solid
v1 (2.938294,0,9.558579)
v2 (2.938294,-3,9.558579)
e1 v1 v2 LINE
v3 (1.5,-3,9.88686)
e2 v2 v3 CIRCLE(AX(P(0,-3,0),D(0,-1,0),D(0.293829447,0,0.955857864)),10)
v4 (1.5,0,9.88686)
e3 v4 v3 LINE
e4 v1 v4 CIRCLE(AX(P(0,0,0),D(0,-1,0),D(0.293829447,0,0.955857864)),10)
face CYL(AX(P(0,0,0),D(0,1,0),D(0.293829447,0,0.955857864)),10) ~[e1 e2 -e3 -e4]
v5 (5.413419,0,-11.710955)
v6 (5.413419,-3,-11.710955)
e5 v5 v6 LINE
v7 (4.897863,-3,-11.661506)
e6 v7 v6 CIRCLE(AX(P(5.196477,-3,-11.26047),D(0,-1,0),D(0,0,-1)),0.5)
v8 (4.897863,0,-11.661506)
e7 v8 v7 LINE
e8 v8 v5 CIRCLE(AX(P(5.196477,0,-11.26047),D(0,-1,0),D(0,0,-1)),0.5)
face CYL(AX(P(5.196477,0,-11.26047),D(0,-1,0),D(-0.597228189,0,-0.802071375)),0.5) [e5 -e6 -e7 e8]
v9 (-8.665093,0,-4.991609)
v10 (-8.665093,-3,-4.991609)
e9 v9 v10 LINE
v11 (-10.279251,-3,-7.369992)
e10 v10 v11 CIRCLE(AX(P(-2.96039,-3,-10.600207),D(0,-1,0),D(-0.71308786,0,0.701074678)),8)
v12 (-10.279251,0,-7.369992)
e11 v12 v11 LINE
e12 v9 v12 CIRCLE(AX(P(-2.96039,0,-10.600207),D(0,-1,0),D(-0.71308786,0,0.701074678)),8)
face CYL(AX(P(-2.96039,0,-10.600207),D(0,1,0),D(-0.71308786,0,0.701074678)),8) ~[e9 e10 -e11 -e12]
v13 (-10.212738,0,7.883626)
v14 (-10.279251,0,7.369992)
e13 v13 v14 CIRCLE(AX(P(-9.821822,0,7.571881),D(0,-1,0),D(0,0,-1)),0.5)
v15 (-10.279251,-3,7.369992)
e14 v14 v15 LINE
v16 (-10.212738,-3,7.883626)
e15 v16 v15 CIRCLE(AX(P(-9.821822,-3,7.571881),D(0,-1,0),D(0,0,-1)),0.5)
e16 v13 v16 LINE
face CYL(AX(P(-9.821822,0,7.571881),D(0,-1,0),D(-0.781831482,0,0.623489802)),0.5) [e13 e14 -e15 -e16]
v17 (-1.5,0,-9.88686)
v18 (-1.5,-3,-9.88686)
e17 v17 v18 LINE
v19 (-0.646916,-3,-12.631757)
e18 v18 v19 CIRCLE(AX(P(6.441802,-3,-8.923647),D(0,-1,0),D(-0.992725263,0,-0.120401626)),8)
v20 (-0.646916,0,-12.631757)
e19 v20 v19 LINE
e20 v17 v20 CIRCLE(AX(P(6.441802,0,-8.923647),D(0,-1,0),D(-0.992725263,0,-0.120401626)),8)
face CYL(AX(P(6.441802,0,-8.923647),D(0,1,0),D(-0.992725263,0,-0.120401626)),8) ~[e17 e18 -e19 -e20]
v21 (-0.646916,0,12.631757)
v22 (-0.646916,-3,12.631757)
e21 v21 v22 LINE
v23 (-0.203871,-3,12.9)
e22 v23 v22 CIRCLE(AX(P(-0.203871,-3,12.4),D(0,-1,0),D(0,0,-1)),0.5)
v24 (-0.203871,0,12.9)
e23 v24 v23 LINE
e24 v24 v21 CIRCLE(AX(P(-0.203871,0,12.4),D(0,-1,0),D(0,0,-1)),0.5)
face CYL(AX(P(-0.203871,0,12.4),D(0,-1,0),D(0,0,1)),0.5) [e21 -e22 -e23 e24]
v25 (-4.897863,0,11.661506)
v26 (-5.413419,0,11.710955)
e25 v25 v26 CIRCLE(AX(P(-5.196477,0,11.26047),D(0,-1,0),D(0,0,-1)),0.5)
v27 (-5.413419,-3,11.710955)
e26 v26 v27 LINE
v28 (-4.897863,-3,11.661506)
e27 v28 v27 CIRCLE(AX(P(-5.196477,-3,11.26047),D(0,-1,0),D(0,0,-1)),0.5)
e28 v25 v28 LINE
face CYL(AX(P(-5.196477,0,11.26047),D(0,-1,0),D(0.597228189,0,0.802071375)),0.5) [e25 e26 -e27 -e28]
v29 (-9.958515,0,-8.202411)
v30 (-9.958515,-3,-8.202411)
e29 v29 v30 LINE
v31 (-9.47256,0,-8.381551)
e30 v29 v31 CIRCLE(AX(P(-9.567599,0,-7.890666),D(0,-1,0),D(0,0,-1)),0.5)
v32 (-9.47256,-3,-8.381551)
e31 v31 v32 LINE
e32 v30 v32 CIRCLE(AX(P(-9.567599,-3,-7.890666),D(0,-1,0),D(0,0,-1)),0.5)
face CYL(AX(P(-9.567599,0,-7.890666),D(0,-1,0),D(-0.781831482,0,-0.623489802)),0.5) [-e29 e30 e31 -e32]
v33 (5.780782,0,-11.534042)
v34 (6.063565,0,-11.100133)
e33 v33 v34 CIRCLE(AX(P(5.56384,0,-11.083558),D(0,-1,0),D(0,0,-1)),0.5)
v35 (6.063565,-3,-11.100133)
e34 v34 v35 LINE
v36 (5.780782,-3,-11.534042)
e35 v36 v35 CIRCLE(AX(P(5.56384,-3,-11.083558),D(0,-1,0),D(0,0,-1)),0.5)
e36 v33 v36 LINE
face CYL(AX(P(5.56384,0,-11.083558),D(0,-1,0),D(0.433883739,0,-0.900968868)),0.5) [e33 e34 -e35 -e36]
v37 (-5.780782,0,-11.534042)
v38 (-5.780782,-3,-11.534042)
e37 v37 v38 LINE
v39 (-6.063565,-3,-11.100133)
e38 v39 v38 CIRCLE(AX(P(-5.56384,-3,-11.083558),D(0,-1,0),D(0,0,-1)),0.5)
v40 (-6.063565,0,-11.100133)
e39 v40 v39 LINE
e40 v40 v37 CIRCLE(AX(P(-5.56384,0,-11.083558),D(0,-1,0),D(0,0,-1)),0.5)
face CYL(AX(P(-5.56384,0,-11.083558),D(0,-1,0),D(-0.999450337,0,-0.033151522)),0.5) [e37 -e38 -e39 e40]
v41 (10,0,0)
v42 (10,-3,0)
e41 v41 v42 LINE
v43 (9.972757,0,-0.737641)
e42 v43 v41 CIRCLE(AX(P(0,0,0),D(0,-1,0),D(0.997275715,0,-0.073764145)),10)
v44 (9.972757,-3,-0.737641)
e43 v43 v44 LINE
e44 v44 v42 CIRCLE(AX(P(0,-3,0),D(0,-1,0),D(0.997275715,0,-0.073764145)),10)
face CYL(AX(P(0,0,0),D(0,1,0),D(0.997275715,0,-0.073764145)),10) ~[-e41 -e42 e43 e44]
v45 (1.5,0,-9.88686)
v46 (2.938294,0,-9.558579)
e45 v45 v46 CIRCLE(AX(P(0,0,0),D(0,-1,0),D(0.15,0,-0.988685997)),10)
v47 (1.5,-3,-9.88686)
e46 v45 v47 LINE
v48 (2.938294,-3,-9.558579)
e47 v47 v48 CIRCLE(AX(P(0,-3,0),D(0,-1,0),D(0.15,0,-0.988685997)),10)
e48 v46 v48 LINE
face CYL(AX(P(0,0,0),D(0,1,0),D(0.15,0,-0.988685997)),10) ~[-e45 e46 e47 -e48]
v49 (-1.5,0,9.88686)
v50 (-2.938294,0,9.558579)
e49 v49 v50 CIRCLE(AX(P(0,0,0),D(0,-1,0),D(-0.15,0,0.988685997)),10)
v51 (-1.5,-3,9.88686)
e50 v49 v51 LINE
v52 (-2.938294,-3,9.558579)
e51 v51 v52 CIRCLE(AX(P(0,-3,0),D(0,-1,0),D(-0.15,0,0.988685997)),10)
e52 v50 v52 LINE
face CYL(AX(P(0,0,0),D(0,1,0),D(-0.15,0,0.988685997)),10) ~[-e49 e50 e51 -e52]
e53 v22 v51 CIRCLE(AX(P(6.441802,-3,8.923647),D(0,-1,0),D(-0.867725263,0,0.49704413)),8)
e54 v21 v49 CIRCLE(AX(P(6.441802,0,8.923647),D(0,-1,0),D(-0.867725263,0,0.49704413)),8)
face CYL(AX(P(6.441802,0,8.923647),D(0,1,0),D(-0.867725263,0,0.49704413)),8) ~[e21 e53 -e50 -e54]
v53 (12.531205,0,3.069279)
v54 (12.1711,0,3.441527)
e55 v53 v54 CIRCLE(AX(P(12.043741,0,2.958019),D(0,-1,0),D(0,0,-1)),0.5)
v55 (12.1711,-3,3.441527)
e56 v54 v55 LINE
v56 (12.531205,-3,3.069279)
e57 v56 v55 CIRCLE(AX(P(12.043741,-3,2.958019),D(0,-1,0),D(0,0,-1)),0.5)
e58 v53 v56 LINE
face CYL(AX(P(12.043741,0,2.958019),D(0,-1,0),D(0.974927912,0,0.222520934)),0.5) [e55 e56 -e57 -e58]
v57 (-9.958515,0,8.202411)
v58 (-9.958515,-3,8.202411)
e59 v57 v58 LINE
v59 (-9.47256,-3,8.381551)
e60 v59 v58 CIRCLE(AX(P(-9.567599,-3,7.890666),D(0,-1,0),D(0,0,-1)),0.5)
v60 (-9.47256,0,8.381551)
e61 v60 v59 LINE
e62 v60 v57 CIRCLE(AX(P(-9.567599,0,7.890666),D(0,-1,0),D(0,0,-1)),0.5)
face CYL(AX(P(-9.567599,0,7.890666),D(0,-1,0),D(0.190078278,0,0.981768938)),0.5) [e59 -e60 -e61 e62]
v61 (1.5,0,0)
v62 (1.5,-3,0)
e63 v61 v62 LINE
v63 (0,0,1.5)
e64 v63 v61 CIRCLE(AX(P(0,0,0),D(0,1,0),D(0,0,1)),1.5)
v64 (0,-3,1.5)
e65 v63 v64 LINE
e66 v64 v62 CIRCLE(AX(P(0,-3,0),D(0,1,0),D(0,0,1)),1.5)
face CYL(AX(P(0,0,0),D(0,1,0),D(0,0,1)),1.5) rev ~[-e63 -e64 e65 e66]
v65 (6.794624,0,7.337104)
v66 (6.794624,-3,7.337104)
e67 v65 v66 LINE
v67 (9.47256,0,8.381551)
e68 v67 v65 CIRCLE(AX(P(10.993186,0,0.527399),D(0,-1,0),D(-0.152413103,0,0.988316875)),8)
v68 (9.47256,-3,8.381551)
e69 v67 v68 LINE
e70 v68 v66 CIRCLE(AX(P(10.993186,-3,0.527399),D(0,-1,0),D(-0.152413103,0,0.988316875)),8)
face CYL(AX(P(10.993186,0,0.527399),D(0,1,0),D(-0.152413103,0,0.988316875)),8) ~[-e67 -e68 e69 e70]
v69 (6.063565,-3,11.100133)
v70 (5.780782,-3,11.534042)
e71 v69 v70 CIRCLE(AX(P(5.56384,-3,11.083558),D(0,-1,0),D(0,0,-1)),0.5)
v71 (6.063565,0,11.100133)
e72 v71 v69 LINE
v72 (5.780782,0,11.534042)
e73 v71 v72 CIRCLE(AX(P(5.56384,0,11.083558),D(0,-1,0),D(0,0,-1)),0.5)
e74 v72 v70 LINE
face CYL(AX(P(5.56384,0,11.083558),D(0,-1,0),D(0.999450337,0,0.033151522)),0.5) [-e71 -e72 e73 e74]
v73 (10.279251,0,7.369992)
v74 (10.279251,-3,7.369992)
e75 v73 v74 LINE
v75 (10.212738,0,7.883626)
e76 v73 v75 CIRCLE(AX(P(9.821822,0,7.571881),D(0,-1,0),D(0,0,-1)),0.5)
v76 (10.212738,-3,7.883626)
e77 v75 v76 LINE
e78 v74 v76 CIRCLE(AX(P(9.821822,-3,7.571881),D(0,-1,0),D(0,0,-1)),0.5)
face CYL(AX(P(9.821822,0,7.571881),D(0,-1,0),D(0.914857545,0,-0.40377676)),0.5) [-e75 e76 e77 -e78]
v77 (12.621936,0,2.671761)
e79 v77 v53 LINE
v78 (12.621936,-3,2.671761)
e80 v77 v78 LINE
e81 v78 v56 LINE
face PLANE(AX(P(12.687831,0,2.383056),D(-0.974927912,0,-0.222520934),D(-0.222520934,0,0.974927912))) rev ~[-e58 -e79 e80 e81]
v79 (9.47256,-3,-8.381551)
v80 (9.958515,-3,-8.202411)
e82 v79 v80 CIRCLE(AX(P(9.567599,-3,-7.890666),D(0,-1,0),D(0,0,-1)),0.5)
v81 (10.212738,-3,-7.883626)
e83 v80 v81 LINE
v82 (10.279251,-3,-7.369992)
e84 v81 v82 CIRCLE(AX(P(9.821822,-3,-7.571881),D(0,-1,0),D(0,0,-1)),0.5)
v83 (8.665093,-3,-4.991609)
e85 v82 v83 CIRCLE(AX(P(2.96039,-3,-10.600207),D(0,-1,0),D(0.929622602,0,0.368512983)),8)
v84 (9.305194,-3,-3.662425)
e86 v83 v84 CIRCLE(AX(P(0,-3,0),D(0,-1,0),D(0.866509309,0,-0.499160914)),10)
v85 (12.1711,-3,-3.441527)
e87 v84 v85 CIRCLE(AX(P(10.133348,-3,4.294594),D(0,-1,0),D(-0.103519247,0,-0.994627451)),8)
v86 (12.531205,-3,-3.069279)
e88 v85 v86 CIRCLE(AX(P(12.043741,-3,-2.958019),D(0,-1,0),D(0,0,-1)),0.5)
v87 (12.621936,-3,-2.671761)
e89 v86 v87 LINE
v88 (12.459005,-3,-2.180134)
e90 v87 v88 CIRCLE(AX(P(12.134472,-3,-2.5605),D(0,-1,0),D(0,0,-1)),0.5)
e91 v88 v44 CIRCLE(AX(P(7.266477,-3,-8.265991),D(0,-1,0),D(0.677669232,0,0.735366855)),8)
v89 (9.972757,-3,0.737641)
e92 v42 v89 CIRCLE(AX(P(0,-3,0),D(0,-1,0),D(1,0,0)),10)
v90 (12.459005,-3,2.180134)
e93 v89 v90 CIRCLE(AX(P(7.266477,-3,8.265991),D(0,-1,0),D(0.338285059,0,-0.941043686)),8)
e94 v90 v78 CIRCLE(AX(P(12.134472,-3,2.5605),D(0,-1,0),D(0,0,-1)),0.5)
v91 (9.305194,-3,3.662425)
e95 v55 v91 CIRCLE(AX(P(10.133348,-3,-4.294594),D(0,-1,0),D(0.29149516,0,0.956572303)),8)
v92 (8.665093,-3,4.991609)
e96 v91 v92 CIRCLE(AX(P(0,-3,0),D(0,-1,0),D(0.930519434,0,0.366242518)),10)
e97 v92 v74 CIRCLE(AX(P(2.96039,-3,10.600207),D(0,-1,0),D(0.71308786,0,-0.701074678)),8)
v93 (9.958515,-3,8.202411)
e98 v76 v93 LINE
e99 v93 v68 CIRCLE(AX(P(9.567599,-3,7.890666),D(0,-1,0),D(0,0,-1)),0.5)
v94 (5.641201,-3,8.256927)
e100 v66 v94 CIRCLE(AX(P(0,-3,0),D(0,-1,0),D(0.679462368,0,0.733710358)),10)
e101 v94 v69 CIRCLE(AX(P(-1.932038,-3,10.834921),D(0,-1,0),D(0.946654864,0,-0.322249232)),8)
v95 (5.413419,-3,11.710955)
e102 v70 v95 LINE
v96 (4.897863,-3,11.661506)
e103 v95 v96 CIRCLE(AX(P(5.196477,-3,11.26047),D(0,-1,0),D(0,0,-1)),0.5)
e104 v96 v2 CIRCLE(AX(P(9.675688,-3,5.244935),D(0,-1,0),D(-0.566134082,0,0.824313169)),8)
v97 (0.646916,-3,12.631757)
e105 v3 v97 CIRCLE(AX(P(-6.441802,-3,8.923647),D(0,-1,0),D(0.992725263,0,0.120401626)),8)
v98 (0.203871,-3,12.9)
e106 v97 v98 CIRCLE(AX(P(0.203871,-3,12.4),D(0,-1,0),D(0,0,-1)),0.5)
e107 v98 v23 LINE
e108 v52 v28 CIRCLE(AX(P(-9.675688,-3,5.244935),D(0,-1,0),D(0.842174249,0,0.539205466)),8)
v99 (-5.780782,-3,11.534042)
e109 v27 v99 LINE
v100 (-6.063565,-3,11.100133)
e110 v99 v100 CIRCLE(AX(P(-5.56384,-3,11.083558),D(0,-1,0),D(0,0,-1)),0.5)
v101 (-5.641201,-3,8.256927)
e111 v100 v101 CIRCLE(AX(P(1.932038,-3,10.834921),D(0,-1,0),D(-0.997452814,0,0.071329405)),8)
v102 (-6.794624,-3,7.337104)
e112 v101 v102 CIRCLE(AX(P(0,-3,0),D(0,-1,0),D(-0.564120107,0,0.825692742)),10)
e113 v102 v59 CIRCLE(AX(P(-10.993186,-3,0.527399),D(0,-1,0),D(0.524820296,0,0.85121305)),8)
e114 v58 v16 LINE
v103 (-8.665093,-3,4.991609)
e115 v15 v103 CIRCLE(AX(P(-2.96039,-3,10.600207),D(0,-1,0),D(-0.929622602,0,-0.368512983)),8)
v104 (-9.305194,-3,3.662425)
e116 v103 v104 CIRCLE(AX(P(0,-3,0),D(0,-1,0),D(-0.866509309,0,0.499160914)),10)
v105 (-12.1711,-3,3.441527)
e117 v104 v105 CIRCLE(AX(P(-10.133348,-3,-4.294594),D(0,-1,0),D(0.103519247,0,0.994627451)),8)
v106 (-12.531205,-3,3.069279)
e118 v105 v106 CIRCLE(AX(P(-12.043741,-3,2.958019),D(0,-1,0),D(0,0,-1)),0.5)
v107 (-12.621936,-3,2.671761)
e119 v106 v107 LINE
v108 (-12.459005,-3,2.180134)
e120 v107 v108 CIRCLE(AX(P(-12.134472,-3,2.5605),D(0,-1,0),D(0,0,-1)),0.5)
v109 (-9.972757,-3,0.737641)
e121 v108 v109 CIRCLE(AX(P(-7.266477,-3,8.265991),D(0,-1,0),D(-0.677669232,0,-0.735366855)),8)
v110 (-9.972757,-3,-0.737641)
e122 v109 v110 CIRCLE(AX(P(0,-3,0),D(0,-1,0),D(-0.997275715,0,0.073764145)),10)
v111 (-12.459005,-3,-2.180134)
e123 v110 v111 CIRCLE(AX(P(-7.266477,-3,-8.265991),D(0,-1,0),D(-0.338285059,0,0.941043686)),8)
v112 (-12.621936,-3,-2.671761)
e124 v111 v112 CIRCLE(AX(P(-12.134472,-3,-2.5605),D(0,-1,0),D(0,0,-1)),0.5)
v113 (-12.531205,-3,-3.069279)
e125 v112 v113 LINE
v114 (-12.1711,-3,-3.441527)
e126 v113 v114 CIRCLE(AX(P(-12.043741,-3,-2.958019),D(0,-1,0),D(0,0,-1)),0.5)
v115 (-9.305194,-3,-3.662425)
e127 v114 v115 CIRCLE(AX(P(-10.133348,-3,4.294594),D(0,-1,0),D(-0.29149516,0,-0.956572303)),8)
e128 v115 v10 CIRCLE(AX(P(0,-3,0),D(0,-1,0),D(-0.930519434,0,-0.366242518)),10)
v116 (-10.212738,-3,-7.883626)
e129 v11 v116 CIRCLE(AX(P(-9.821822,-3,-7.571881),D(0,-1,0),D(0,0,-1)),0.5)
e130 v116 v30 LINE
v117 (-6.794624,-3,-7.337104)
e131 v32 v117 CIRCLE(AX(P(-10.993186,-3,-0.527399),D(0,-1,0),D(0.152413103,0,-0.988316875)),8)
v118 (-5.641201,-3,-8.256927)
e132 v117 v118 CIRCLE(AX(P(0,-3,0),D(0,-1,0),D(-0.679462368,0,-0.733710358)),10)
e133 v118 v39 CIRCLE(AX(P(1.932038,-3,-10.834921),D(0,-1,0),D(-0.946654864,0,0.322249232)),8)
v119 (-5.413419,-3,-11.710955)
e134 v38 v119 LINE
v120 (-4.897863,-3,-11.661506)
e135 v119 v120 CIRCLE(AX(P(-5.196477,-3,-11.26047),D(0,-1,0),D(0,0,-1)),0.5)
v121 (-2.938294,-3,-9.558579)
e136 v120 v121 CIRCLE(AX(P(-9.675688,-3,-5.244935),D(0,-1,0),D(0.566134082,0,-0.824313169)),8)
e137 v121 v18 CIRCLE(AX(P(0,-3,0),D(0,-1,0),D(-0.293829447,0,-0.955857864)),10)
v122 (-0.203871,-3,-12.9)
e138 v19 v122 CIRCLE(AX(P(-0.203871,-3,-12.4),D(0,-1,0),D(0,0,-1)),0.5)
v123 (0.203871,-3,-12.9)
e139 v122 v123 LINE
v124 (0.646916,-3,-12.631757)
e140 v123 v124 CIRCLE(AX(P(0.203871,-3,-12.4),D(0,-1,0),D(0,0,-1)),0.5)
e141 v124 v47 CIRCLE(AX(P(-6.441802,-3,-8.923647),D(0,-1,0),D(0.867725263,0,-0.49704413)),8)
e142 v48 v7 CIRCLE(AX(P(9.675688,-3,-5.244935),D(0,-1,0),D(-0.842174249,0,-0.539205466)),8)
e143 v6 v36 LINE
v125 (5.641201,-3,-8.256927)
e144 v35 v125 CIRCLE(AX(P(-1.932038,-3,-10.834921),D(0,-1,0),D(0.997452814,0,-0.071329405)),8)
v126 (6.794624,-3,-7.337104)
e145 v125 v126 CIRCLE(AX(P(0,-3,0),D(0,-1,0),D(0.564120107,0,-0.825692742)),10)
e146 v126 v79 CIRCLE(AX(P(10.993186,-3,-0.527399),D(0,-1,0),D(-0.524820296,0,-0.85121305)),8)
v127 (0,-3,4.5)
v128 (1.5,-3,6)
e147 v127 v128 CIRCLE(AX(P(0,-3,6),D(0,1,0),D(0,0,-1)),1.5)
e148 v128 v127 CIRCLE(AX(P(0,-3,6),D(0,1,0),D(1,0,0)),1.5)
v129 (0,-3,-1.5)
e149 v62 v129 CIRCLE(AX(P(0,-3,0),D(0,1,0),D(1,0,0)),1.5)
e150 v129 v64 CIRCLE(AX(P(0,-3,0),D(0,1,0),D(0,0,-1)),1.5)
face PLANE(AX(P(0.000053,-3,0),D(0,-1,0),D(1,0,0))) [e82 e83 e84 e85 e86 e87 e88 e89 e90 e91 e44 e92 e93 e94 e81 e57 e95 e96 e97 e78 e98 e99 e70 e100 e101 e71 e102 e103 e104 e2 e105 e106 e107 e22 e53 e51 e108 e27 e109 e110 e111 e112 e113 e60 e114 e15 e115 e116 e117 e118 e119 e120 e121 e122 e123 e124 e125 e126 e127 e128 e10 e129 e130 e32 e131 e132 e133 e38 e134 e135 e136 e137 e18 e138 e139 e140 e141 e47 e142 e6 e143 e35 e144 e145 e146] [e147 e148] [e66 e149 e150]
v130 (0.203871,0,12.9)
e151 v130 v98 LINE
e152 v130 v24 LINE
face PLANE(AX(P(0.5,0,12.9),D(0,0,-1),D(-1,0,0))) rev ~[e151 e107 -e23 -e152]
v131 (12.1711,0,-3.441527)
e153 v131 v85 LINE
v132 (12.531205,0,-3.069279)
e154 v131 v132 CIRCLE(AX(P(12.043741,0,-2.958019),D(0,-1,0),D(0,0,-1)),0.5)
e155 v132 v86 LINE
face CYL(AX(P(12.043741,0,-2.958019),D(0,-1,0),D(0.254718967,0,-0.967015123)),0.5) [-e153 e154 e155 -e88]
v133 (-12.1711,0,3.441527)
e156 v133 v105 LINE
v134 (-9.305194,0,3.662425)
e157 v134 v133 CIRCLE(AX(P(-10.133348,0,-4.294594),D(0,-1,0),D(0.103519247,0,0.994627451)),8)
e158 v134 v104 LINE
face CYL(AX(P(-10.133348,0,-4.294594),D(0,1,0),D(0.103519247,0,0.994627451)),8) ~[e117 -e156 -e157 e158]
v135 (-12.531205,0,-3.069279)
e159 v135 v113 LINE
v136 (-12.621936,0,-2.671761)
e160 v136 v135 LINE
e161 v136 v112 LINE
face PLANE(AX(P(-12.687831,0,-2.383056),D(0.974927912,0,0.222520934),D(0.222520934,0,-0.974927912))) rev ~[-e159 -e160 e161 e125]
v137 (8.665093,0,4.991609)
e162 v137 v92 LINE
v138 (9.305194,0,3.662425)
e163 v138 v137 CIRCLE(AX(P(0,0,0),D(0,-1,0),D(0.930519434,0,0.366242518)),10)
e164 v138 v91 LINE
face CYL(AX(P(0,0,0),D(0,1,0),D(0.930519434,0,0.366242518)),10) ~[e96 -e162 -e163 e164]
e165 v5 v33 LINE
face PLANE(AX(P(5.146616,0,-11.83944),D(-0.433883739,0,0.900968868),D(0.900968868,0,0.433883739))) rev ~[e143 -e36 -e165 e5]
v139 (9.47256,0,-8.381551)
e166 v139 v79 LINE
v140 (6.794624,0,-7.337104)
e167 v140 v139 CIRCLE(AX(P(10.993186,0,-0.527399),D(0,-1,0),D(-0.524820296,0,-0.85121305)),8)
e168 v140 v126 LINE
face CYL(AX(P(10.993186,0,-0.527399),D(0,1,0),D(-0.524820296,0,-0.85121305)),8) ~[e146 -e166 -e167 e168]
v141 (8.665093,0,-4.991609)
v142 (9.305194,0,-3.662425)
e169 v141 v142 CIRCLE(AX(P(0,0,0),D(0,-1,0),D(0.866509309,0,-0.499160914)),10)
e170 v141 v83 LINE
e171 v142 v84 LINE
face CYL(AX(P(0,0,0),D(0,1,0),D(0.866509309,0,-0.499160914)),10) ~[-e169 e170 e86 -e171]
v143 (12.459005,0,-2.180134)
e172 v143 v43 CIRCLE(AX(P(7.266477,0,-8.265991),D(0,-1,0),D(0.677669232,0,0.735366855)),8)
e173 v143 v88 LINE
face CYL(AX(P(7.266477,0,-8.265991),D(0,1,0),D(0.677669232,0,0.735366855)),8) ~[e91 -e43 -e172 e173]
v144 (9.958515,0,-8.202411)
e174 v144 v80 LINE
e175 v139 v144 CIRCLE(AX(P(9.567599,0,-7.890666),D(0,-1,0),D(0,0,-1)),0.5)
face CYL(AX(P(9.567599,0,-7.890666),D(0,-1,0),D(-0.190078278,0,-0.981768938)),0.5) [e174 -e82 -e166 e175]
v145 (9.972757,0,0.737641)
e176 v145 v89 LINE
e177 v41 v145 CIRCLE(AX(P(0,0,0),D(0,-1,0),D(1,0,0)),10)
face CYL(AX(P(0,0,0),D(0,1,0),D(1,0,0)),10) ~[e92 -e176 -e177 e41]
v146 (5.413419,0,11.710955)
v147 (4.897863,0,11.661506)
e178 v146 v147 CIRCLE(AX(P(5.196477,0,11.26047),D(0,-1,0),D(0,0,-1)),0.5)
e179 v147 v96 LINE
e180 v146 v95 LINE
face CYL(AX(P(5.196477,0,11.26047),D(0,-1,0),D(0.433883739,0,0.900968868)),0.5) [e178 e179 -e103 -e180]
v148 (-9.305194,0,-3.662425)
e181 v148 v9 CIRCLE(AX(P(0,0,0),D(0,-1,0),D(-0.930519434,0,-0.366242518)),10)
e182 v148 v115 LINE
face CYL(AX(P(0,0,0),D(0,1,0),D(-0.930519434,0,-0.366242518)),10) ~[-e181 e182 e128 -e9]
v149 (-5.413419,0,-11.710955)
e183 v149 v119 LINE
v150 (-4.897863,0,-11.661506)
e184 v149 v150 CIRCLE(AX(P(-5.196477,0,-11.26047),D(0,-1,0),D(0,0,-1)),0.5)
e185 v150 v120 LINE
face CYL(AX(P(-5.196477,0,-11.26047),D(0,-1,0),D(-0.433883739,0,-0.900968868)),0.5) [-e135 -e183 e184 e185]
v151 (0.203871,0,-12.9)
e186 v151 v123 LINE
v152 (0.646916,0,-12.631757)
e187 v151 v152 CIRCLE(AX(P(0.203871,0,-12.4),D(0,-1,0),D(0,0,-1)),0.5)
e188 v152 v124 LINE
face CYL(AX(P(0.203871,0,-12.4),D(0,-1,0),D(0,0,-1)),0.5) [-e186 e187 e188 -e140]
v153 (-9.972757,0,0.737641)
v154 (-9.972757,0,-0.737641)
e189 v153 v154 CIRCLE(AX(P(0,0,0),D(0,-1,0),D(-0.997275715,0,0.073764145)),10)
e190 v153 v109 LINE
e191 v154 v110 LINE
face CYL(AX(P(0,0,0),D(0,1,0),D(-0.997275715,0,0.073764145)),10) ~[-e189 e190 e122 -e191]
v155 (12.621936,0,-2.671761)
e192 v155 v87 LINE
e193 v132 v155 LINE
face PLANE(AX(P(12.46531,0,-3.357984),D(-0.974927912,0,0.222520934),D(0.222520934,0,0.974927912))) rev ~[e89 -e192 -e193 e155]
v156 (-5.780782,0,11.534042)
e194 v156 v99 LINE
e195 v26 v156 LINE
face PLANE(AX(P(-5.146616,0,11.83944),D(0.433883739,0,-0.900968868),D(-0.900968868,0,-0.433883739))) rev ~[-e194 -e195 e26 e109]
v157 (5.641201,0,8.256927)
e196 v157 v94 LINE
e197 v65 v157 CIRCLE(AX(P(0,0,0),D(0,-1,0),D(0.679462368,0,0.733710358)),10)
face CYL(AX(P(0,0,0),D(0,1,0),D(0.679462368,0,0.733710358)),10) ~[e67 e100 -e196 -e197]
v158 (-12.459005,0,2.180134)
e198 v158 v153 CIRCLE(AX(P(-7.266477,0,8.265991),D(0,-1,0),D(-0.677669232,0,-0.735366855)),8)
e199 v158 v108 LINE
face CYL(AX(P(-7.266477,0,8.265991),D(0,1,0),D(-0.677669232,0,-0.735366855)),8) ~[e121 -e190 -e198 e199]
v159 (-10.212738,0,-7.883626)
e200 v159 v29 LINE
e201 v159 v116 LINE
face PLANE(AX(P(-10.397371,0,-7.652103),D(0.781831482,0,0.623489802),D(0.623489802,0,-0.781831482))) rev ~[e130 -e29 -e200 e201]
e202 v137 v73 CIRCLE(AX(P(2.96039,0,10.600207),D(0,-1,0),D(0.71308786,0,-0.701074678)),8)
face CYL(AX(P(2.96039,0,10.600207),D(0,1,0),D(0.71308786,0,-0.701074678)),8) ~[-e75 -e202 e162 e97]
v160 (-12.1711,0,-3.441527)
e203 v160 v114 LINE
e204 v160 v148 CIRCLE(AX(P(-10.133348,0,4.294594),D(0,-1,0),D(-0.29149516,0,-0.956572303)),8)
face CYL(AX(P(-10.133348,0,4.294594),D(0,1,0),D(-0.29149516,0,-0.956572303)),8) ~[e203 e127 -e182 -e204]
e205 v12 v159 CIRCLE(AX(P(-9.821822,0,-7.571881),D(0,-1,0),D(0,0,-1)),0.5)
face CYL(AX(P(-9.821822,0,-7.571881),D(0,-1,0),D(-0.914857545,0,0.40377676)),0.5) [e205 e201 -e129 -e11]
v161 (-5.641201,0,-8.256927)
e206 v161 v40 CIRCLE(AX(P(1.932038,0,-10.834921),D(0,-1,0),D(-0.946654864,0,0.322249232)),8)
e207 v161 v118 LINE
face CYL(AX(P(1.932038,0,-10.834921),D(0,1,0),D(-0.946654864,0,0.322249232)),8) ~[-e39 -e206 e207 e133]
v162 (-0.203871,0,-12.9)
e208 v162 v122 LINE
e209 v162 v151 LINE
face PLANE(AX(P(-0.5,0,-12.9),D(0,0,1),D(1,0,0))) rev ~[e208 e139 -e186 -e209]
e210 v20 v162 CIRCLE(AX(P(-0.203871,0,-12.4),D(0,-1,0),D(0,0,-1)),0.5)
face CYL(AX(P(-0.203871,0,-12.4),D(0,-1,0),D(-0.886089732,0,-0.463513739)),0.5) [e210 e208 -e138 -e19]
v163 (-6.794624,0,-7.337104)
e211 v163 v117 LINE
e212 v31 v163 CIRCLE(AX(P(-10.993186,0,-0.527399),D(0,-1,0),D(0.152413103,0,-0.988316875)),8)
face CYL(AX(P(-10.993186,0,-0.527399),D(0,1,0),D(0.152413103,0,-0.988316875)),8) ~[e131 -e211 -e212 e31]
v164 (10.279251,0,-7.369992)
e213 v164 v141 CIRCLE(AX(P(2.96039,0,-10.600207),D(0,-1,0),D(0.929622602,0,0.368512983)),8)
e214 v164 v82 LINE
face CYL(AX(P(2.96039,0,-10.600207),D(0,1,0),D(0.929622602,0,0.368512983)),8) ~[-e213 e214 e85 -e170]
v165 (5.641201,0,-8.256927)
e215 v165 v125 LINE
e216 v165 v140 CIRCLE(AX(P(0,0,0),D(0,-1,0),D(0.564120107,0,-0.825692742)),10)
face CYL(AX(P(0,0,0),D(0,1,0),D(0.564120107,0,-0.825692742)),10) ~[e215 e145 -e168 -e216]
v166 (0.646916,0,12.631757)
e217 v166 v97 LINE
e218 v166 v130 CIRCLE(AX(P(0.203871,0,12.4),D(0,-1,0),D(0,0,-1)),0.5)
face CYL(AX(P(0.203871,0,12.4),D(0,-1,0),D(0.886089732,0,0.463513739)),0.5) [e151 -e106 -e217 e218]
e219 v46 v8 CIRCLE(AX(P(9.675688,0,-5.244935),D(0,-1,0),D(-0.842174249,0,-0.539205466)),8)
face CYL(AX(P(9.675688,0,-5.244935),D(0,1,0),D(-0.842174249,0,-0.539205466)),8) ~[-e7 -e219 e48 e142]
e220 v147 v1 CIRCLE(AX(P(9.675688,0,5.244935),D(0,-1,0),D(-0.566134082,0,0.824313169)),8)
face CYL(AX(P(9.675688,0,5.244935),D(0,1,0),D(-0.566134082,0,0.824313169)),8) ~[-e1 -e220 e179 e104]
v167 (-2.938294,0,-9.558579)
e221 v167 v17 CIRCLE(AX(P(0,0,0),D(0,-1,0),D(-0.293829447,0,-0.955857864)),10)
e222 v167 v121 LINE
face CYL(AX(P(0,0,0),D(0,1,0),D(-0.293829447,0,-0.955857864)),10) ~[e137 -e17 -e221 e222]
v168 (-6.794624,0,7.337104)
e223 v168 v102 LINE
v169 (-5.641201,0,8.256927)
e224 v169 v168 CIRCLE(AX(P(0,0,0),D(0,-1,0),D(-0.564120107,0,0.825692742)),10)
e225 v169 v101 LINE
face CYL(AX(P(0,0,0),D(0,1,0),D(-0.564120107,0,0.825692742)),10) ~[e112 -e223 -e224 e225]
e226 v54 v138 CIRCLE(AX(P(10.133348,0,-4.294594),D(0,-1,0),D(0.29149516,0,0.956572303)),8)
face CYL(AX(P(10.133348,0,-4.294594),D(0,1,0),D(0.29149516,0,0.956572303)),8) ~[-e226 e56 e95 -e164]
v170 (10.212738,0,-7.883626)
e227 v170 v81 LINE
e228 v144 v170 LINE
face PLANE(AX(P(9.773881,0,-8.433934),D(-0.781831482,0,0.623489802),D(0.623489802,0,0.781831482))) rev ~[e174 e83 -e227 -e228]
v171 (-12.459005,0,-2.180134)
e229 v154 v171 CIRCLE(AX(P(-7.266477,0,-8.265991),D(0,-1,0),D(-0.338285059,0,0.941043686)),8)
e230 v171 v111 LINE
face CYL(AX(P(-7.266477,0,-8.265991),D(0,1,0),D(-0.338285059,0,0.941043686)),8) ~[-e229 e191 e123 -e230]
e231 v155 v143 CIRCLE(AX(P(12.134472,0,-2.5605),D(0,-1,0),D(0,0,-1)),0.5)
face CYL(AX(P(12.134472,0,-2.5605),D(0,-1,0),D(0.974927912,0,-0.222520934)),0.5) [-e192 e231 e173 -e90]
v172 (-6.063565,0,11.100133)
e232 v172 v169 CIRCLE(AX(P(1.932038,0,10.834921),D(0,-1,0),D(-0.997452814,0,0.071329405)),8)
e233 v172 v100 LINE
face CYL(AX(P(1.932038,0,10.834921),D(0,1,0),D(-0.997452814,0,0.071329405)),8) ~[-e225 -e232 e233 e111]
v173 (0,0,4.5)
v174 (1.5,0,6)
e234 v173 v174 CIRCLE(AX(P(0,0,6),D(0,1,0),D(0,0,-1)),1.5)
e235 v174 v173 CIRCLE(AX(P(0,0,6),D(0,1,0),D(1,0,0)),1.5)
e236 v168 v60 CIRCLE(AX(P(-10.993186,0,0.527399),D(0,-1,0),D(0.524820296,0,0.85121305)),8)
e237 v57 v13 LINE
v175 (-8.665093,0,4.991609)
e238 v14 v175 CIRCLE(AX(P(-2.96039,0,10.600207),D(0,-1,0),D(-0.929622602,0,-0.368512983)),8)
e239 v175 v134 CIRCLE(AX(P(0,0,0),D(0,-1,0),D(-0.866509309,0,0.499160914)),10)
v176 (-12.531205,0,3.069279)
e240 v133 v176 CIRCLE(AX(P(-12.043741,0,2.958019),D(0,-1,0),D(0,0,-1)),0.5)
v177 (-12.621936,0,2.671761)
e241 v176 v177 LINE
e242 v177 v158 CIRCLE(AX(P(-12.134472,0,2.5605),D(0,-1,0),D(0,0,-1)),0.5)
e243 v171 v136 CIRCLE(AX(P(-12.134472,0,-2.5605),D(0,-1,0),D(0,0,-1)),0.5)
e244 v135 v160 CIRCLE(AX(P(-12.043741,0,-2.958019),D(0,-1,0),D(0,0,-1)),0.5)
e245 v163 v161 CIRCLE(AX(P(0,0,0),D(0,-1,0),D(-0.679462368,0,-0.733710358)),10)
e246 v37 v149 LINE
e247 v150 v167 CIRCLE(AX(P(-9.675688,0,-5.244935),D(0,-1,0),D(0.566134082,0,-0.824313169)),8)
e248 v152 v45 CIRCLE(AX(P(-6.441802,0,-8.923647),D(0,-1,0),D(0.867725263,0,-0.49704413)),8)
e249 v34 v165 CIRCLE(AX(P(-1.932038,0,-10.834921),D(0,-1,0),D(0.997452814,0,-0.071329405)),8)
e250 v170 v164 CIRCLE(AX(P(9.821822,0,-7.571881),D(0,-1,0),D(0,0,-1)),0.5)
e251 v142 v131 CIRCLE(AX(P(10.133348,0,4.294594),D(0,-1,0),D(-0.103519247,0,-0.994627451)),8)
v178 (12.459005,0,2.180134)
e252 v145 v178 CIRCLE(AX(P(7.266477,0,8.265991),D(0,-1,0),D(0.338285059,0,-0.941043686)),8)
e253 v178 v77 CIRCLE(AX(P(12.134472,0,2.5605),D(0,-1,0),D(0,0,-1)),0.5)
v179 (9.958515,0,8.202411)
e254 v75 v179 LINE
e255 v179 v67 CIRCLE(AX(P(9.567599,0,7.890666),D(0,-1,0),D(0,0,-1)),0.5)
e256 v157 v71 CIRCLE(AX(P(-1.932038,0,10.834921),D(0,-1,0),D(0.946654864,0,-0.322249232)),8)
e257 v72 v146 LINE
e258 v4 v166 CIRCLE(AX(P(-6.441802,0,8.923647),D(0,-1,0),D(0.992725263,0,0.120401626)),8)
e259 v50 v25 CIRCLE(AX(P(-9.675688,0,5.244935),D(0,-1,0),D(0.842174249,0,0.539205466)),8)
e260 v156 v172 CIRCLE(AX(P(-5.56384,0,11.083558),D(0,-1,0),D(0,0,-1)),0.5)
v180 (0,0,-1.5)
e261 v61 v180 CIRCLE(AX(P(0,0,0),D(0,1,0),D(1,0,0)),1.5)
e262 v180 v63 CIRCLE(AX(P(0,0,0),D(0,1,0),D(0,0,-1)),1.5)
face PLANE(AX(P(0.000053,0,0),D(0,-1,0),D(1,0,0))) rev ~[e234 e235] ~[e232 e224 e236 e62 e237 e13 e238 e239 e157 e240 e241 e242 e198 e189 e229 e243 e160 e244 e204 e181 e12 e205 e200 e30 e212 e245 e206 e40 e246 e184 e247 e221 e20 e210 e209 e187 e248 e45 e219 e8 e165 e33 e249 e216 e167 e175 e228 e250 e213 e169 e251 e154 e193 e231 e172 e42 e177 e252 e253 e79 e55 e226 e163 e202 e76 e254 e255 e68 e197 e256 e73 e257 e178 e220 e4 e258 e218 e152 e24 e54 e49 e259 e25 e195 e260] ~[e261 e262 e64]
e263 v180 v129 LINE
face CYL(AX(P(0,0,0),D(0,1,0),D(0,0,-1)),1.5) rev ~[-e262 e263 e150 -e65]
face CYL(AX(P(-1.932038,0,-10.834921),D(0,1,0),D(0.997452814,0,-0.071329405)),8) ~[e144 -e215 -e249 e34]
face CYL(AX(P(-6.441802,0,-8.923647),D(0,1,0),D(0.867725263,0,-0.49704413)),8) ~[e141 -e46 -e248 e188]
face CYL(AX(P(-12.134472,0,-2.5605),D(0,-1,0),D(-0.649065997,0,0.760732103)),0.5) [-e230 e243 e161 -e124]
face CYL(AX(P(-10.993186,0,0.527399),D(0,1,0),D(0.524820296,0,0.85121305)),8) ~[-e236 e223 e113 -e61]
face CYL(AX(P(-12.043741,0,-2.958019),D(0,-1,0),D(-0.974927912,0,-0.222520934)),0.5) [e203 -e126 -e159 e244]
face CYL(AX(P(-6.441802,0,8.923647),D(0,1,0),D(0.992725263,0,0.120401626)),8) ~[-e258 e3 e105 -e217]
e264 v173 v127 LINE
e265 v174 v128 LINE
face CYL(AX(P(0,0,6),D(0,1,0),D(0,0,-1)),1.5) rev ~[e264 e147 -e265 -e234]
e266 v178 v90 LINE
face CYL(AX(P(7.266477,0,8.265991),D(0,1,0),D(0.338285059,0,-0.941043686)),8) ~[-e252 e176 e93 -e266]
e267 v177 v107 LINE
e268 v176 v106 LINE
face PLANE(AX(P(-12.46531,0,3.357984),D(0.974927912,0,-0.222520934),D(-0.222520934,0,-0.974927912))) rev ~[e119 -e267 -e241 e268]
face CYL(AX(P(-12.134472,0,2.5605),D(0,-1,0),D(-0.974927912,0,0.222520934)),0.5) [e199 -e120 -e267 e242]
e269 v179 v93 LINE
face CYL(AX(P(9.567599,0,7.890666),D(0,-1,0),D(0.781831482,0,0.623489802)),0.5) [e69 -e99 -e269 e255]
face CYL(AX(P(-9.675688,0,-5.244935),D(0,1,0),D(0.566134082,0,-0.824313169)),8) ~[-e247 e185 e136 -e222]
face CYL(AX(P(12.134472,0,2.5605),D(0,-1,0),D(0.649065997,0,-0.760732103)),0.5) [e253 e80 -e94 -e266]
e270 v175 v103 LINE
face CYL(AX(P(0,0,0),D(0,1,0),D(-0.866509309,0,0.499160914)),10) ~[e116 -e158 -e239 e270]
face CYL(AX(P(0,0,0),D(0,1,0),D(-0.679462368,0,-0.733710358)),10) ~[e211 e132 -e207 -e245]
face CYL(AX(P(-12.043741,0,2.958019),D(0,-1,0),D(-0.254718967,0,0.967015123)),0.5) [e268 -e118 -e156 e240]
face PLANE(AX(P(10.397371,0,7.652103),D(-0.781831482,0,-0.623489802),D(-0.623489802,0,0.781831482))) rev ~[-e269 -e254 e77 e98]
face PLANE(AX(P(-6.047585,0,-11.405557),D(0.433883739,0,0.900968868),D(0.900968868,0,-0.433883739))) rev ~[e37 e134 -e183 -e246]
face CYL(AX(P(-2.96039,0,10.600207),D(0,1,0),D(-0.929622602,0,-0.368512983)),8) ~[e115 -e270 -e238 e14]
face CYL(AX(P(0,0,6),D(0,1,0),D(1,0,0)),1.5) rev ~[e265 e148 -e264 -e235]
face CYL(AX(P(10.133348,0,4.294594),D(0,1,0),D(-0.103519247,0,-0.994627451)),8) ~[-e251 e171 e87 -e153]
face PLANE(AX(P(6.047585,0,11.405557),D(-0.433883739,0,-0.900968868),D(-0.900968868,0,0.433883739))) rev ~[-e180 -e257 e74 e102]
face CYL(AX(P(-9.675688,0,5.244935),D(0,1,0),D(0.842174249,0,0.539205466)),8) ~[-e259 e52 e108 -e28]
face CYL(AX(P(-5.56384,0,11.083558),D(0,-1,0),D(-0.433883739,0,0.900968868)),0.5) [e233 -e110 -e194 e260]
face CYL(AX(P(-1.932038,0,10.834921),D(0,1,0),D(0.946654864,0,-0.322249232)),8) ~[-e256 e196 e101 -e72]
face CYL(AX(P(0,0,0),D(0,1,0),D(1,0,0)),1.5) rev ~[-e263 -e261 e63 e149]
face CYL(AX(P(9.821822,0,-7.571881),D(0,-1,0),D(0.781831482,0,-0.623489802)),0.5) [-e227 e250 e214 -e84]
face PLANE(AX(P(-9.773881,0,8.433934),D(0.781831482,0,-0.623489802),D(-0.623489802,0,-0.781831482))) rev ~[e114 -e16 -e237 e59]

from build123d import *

# Parameters (mm, degrees)
F1_DEPTH = 3
F2_R     = 0.5


# Not quite as in the source:
# - a feature names something its author has since deleted; it is built from what else it names


with BuildPart() as f1:
    # F0 (on Front) → F1 (new body)
    with BuildSketch(Plane.XZ):
        with BuildLine():
            ThreePointArc((9.9727571462, -0.7376414454), (9.9931869657, -0.3690721728), (10, 0))
            ThreePointArc((10, 0), (9.9931869657, 0.3690721728), (9.9727571462, 0.7376414454))
            ThreePointArc((9.9727571462, 0.7376414454), (9.7492791218, 2.2252093396), (9.3051943444, 3.6624251819))
            ThreePointArc((9.3051943444, 3.6624251819), (9.009688679, 4.3388373912), (8.6650930875, 4.9916091379))
            ThreePointArc((8.6650930875, 4.9916091379), (7.8183148247, 6.2348980186), (6.7946236819, 7.3371035853))
            ThreePointArc((6.7946236819, 7.3371035853), (6.2348980186, 7.8183148247), (5.6412010723, 8.2569274226))
            ThreePointArc((5.6412010723, 8.2569274226), (4.3388373912, 9.009688679), (2.9382944686, 9.5585786399))
            ThreePointArc((2.9382944686, 9.5585786399), (2.2252093396, 9.7492791218), (1.5, 9.8868599666))
            ThreePointArc((1.5, 9.8868599666), (0, 10), (-1.5, 9.8868599666))
            ThreePointArc((-1.5, 9.8868599666), (-2.2252093396, 9.7492791218), (-2.9382944686, 9.5585786399))
            ThreePointArc((-2.9382944686, 9.5585786399), (-4.3388373912, 9.009688679), (-5.6412010723, 8.2569274226))
            ThreePointArc((-5.6412010723, 8.2569274226), (-6.2348980186, 7.8183148247), (-6.7946236819, 7.3371035853))
            ThreePointArc((-6.7946236819, 7.3371035853), (-7.8183148247, 6.2348980186), (-8.6650930875, 4.9916091379))
            ThreePointArc((-8.6650930875, 4.9916091379), (-9.009688679, 4.3388373912), (-9.3051943444, 3.6624251819))
            ThreePointArc((-9.3051943444, 3.6624251819), (-9.7492791218, 2.2252093396), (-9.9727571462, 0.7376414454))
            ThreePointArc((-9.9727571462, 0.7376414454), (-10, 0), (-9.9727571462, -0.7376414454))
            ThreePointArc((-9.9727571462, -0.7376414454), (-9.7492791218, -2.2252093396), (-9.3051943444, -3.6624251819))
            ThreePointArc((-9.3051943444, -3.6624251819), (-9.009688679, -4.3388373912), (-8.6650930875, -4.9916091379))
            ThreePointArc((-8.6650930875, -4.9916091379), (-7.8183148247, -6.2348980186), (-6.7946236819, -7.3371035853))
            ThreePointArc((-6.7946236819, -7.3371035853), (-6.2348980186, -7.8183148247), (-5.6412010723, -8.2569274226))
            ThreePointArc((-5.6412010723, -8.2569274226), (-4.3388373912, -9.009688679), (-2.9382944686, -9.5585786399))
            ThreePointArc((-2.9382944686, -9.5585786399), (-2.2252093396, -9.7492791218), (-1.5, -9.8868599666))
            ThreePointArc((-1.5, -9.8868599666), (0, -10), (1.5, -9.8868599666))
            ThreePointArc((1.5, -9.8868599666), (2.2252093396, -9.7492791218), (2.9382944686, -9.5585786399))
            ThreePointArc((2.9382944686, -9.5585786399), (4.3388373912, -9.009688679), (5.6412010723, -8.2569274226))
            ThreePointArc((5.6412010723, -8.2569274226), (6.2348980186, -7.8183148247), (6.7946236819, -7.3371035853))
            ThreePointArc((6.7946236819, -7.3371035853), (7.8183148247, -6.2348980186), (8.6650930875, -4.9916091379))
            ThreePointArc((8.6650930875, -4.9916091379), (9.009688679, -4.3388373912), (9.3051943444, -3.6624251819))
            ThreePointArc((9.3051943444, -3.6624251819), (9.7492791218, -2.2252093396), (9.9727571462, -0.7376414454))
        make_face()
        with BuildLine():
            ThreePointArc((0, 1.5), (1.0606601718, 1.0606601718), (1.5, 0))
            ThreePointArc((1.5, 0), (1.0606601718, -1.0606601718), (0, -1.5))
            ThreePointArc((0, -1.5), (-1.5, 0), (0, 1.5))
        make_face(mode=Mode.SUBTRACT)
        with BuildLine():
            ThreePointArc((1.5, 6), (1.0606601718, 4.9393398282), (0, 4.5))
            ThreePointArc((0, 4.5), (-1.0606601718, 7.0606601718), (1.5, 6))
        make_face(mode=Mode.SUBTRACT)
        with BuildLine():
            ThreePointArc((-5.6412010723, 8.2569274226), (-4.3388373912, 9.009688679), (-2.9382944686, 9.5585786399))
            ThreePointArc((-2.9382944686, 9.5585786399), (-3.9281759427, 10.8096541208), (-5.1466158007, 11.8394402655))
            Line((-5.1466158007, 11.8394402655), (-6.0475846686, 11.4055565264))
            ThreePointArc((-6.0475846686, 11.4055565264), (-6.002150266, 9.8108807266), (-5.6412010723, 8.2569274226))
        make_face()
        with BuildLine():
            ThreePointArc((-1.5, 9.8868599666), (0, 10), (1.5, 9.8868599666))
            ThreePointArc((1.5, 9.8868599666), (1.1509689165, 11.4435335015), (0.5, 12.9))
            Line((0.5, 12.9), (-0.5, 12.9))
            ThreePointArc((-0.5, 12.9), (-1.1509689165, 11.4435335015), (-1.5, 9.8868599666))
        make_face()
        with BuildLine():
            ThreePointArc((-8.6650930875, 4.9916091379), (-7.8183148247, 6.2348980186), (-6.7946236819, 7.3371035853))
            ThreePointArc((-6.7946236819, 7.3371035853), (-8.2292973805, 8.0347901697), (-9.7738812229, 8.4339341852))
            Line((-9.7738812229, 8.4339341852), (-10.3973710248, 7.6521027027))
            ThreePointArc((-10.3973710248, 7.6521027027), (-9.6645321438, 6.2350627012), (-8.6650930875, 4.9916091379))
        make_face()
        with BuildLine():
            ThreePointArc((-9.9727571462, 0.7376414454), (-9.7492791218, 2.2252093396), (-9.3051943444, 3.6624251819))
            ThreePointArc((-9.3051943444, 3.6624251819), (-10.9005055464, 3.6685374852), (-12.4653096002, 3.3579840041))
            Line((-12.4653096002, 3.3579840041), (-12.6878305341, 2.3830560919))
            ThreePointArc((-12.6878305341, 2.3830560919), (-11.4127349029, 1.4243140398), (-9.9727571462, 0.7376414454))
        make_face()
        with BuildLine():
            ThreePointArc((-12.4653096002, -3.3579840041), (-10.9005055464, -3.6685374852), (-9.3051943444, -3.6624251819))
            ThreePointArc((-9.3051943444, -3.6624251819), (-9.7492791218, -2.2252093396), (-9.9727571462, -0.7376414454))
            ThreePointArc((-9.9727571462, -0.7376414454), (-11.4127349029, -1.4243140398), (-12.6878305341, -2.3830560919))
            Line((-12.6878305341, -2.3830560919), (-12.4653096002, -3.3579840041))
        make_face()
        with BuildLine():
            ThreePointArc((-9.7738812229, -8.4339341852), (-8.2292973805, -8.0347901697), (-6.7946236819, -7.3371035853))
            ThreePointArc((-6.7946236819, -7.3371035853), (-7.8183148247, -6.2348980186), (-8.6650930875, -4.9916091379))
            ThreePointArc((-8.6650930875, -4.9916091379), (-9.6645321438, -6.2350627012), (-10.3973710248, -7.6521027027))
            Line((-10.3973710248, -7.6521027027), (-9.7738812229, -8.4339341852))
        make_face()
        with BuildLine():
            ThreePointArc((-5.1466158007, -11.8394402655), (-3.9281759427, -10.8096541208), (-2.9382944686, -9.5585786399))
            ThreePointArc((-2.9382944686, -9.5585786399), (-4.3388373912, -9.009688679), (-5.6412010723, -8.2569274226))
            ThreePointArc((-5.6412010723, -8.2569274226), (-6.002150266, -9.8108807266), (-6.0475846686, -11.4055565264))
            Line((-6.0475846686, -11.4055565264), (-5.1466158007, -11.8394402655))
        make_face()
        with BuildLine():
            ThreePointArc((0.5, -12.9), (1.1509689165, -11.4435335015), (1.5, -9.8868599666))
            ThreePointArc((1.5, -9.8868599666), (0, -10), (-1.5, -9.8868599666))
            ThreePointArc((-1.5, -9.8868599666), (-1.1509689165, -11.4435335015), (-0.5, -12.9))
            Line((-0.5, -12.9), (0.5, -12.9))
        make_face()
        with BuildLine():
            ThreePointArc((6.0475846686, -11.4055565264), (6.002150266, -9.8108807266), (5.6412010723, -8.2569274226))
            ThreePointArc((5.6412010723, -8.2569274226), (4.3388373912, -9.009688679), (2.9382944686, -9.5585786399))
            ThreePointArc((2.9382944686, -9.5585786399), (3.9281759427, -10.8096541208), (5.1466158007, -11.8394402655))
            Line((5.1466158007, -11.8394402655), (6.0475846686, -11.4055565264))
        make_face()
        with BuildLine():
            ThreePointArc((10.3973710248, -7.6521027027), (9.6645321438, -6.2350627012), (8.6650930875, -4.9916091379))
            ThreePointArc((8.6650930875, -4.9916091379), (7.8183148247, -6.2348980186), (6.7946236819, -7.3371035853))
            ThreePointArc((6.7946236819, -7.3371035853), (8.2292973805, -8.0347901697), (9.7738812229, -8.4339341852))
            Line((9.7738812229, -8.4339341852), (10.3973710248, -7.6521027027))
        make_face()
        with BuildLine():
            ThreePointArc((12.6878305341, -2.3830560919), (11.4127349029, -1.4243140398), (9.9727571462, -0.7376414454))
            ThreePointArc((9.9727571462, -0.7376414454), (9.7492791218, -2.2252093396), (9.3051943444, -3.6624251819))
            ThreePointArc((9.3051943444, -3.6624251819), (10.9005055464, -3.6685374852), (12.4653096002, -3.3579840041))
            Line((12.4653096002, -3.3579840041), (12.6878305341, -2.3830560919))
        make_face()
        with BuildLine():
            ThreePointArc((9.3051943444, 3.6624251819), (9.7492791218, 2.2252093396), (9.9727571462, 0.7376414454))
            ThreePointArc((9.9727571462, 0.7376414454), (11.4127349029, 1.4243140398), (12.6878305341, 2.3830560919))
            Line((12.6878305341, 2.3830560919), (12.4653096002, 3.3579840041))
            ThreePointArc((12.4653096002, 3.3579840041), (10.9005055464, 3.6685374852), (9.3051943444, 3.6624251819))
        make_face()
        with BuildLine():
            ThreePointArc((6.7946236819, 7.3371035853), (7.8183148247, 6.2348980186), (8.6650930875, 4.9916091379))
            ThreePointArc((8.6650930875, 4.9916091379), (9.6645321438, 6.2350627012), (10.3973710248, 7.6521027027))
            Line((10.3973710248, 7.6521027027), (9.7738812229, 8.4339341852))
            ThreePointArc((9.7738812229, 8.4339341852), (8.2292973805, 8.0347901697), (6.7946236819, 7.3371035853))
        make_face()
        with BuildLine():
            ThreePointArc((2.9382944686, 9.5585786399), (4.3388373912, 9.009688679), (5.6412010723, 8.2569274226))
            ThreePointArc((5.6412010723, 8.2569274226), (6.002150266, 9.8108807266), (6.0475846686, 11.4055565264))
            Line((6.0475846686, 11.4055565264), (5.1466158007, 11.8394402655))
            ThreePointArc((5.1466158007, 11.8394402655), (3.9281759427, 10.8096541208), (2.9382944686, 9.5585786399))
        make_face()
    extrude(amount=F1_DEPTH)

    # F2
    f2_edges = [f1.edges().sort_by_distance(p)[0] for p in [
        (-5.146616, -1.5, 11.83944),
        (-6.047585, -1.5, 11.405557),
        (-9.773881, -1.5, 8.433934),
        (-10.397371, -1.5, 7.652103),
        (-0.5, -1.5, 12.9),
        (0.5, -1.5, 12.9),
        (5.146616, -1.5, 11.83944),
        (6.047585, -1.5, 11.405557),
        (9.773881, -1.5, 8.433934),
        (10.397371, -1.5, 7.652103),
        (12.46531, -1.5, 3.357984),
        (12.687831, -1.5, 2.383056),
        (12.687831, -1.5, -2.383056),
        (12.46531, -1.5, -3.357984),
        (10.397371, -1.5, -7.652103),
        (9.773881, -1.5, -8.433934),
        (6.047585, -1.5, -11.405557),
        (5.146616, -1.5, -11.83944),
        (0.5, -1.5, -12.9),
        (-0.5, -1.5, -12.9),
        (-5.146616, -1.5, -11.83944),
        (-6.047585, -1.5, -11.405557),
        (-12.46531, -1.5, 3.357984),
        (-12.687831, -1.5, 2.383056),
        (-12.687831, -1.5, -2.383056),
        (-12.46531, -1.5, -3.357984),
        (-9.773881, -1.5, -8.433934),
        (-10.397371, -1.5, -7.652103),
    ]]
    fillet(f2_edges, radius=F2_R)


solid = f1.part
